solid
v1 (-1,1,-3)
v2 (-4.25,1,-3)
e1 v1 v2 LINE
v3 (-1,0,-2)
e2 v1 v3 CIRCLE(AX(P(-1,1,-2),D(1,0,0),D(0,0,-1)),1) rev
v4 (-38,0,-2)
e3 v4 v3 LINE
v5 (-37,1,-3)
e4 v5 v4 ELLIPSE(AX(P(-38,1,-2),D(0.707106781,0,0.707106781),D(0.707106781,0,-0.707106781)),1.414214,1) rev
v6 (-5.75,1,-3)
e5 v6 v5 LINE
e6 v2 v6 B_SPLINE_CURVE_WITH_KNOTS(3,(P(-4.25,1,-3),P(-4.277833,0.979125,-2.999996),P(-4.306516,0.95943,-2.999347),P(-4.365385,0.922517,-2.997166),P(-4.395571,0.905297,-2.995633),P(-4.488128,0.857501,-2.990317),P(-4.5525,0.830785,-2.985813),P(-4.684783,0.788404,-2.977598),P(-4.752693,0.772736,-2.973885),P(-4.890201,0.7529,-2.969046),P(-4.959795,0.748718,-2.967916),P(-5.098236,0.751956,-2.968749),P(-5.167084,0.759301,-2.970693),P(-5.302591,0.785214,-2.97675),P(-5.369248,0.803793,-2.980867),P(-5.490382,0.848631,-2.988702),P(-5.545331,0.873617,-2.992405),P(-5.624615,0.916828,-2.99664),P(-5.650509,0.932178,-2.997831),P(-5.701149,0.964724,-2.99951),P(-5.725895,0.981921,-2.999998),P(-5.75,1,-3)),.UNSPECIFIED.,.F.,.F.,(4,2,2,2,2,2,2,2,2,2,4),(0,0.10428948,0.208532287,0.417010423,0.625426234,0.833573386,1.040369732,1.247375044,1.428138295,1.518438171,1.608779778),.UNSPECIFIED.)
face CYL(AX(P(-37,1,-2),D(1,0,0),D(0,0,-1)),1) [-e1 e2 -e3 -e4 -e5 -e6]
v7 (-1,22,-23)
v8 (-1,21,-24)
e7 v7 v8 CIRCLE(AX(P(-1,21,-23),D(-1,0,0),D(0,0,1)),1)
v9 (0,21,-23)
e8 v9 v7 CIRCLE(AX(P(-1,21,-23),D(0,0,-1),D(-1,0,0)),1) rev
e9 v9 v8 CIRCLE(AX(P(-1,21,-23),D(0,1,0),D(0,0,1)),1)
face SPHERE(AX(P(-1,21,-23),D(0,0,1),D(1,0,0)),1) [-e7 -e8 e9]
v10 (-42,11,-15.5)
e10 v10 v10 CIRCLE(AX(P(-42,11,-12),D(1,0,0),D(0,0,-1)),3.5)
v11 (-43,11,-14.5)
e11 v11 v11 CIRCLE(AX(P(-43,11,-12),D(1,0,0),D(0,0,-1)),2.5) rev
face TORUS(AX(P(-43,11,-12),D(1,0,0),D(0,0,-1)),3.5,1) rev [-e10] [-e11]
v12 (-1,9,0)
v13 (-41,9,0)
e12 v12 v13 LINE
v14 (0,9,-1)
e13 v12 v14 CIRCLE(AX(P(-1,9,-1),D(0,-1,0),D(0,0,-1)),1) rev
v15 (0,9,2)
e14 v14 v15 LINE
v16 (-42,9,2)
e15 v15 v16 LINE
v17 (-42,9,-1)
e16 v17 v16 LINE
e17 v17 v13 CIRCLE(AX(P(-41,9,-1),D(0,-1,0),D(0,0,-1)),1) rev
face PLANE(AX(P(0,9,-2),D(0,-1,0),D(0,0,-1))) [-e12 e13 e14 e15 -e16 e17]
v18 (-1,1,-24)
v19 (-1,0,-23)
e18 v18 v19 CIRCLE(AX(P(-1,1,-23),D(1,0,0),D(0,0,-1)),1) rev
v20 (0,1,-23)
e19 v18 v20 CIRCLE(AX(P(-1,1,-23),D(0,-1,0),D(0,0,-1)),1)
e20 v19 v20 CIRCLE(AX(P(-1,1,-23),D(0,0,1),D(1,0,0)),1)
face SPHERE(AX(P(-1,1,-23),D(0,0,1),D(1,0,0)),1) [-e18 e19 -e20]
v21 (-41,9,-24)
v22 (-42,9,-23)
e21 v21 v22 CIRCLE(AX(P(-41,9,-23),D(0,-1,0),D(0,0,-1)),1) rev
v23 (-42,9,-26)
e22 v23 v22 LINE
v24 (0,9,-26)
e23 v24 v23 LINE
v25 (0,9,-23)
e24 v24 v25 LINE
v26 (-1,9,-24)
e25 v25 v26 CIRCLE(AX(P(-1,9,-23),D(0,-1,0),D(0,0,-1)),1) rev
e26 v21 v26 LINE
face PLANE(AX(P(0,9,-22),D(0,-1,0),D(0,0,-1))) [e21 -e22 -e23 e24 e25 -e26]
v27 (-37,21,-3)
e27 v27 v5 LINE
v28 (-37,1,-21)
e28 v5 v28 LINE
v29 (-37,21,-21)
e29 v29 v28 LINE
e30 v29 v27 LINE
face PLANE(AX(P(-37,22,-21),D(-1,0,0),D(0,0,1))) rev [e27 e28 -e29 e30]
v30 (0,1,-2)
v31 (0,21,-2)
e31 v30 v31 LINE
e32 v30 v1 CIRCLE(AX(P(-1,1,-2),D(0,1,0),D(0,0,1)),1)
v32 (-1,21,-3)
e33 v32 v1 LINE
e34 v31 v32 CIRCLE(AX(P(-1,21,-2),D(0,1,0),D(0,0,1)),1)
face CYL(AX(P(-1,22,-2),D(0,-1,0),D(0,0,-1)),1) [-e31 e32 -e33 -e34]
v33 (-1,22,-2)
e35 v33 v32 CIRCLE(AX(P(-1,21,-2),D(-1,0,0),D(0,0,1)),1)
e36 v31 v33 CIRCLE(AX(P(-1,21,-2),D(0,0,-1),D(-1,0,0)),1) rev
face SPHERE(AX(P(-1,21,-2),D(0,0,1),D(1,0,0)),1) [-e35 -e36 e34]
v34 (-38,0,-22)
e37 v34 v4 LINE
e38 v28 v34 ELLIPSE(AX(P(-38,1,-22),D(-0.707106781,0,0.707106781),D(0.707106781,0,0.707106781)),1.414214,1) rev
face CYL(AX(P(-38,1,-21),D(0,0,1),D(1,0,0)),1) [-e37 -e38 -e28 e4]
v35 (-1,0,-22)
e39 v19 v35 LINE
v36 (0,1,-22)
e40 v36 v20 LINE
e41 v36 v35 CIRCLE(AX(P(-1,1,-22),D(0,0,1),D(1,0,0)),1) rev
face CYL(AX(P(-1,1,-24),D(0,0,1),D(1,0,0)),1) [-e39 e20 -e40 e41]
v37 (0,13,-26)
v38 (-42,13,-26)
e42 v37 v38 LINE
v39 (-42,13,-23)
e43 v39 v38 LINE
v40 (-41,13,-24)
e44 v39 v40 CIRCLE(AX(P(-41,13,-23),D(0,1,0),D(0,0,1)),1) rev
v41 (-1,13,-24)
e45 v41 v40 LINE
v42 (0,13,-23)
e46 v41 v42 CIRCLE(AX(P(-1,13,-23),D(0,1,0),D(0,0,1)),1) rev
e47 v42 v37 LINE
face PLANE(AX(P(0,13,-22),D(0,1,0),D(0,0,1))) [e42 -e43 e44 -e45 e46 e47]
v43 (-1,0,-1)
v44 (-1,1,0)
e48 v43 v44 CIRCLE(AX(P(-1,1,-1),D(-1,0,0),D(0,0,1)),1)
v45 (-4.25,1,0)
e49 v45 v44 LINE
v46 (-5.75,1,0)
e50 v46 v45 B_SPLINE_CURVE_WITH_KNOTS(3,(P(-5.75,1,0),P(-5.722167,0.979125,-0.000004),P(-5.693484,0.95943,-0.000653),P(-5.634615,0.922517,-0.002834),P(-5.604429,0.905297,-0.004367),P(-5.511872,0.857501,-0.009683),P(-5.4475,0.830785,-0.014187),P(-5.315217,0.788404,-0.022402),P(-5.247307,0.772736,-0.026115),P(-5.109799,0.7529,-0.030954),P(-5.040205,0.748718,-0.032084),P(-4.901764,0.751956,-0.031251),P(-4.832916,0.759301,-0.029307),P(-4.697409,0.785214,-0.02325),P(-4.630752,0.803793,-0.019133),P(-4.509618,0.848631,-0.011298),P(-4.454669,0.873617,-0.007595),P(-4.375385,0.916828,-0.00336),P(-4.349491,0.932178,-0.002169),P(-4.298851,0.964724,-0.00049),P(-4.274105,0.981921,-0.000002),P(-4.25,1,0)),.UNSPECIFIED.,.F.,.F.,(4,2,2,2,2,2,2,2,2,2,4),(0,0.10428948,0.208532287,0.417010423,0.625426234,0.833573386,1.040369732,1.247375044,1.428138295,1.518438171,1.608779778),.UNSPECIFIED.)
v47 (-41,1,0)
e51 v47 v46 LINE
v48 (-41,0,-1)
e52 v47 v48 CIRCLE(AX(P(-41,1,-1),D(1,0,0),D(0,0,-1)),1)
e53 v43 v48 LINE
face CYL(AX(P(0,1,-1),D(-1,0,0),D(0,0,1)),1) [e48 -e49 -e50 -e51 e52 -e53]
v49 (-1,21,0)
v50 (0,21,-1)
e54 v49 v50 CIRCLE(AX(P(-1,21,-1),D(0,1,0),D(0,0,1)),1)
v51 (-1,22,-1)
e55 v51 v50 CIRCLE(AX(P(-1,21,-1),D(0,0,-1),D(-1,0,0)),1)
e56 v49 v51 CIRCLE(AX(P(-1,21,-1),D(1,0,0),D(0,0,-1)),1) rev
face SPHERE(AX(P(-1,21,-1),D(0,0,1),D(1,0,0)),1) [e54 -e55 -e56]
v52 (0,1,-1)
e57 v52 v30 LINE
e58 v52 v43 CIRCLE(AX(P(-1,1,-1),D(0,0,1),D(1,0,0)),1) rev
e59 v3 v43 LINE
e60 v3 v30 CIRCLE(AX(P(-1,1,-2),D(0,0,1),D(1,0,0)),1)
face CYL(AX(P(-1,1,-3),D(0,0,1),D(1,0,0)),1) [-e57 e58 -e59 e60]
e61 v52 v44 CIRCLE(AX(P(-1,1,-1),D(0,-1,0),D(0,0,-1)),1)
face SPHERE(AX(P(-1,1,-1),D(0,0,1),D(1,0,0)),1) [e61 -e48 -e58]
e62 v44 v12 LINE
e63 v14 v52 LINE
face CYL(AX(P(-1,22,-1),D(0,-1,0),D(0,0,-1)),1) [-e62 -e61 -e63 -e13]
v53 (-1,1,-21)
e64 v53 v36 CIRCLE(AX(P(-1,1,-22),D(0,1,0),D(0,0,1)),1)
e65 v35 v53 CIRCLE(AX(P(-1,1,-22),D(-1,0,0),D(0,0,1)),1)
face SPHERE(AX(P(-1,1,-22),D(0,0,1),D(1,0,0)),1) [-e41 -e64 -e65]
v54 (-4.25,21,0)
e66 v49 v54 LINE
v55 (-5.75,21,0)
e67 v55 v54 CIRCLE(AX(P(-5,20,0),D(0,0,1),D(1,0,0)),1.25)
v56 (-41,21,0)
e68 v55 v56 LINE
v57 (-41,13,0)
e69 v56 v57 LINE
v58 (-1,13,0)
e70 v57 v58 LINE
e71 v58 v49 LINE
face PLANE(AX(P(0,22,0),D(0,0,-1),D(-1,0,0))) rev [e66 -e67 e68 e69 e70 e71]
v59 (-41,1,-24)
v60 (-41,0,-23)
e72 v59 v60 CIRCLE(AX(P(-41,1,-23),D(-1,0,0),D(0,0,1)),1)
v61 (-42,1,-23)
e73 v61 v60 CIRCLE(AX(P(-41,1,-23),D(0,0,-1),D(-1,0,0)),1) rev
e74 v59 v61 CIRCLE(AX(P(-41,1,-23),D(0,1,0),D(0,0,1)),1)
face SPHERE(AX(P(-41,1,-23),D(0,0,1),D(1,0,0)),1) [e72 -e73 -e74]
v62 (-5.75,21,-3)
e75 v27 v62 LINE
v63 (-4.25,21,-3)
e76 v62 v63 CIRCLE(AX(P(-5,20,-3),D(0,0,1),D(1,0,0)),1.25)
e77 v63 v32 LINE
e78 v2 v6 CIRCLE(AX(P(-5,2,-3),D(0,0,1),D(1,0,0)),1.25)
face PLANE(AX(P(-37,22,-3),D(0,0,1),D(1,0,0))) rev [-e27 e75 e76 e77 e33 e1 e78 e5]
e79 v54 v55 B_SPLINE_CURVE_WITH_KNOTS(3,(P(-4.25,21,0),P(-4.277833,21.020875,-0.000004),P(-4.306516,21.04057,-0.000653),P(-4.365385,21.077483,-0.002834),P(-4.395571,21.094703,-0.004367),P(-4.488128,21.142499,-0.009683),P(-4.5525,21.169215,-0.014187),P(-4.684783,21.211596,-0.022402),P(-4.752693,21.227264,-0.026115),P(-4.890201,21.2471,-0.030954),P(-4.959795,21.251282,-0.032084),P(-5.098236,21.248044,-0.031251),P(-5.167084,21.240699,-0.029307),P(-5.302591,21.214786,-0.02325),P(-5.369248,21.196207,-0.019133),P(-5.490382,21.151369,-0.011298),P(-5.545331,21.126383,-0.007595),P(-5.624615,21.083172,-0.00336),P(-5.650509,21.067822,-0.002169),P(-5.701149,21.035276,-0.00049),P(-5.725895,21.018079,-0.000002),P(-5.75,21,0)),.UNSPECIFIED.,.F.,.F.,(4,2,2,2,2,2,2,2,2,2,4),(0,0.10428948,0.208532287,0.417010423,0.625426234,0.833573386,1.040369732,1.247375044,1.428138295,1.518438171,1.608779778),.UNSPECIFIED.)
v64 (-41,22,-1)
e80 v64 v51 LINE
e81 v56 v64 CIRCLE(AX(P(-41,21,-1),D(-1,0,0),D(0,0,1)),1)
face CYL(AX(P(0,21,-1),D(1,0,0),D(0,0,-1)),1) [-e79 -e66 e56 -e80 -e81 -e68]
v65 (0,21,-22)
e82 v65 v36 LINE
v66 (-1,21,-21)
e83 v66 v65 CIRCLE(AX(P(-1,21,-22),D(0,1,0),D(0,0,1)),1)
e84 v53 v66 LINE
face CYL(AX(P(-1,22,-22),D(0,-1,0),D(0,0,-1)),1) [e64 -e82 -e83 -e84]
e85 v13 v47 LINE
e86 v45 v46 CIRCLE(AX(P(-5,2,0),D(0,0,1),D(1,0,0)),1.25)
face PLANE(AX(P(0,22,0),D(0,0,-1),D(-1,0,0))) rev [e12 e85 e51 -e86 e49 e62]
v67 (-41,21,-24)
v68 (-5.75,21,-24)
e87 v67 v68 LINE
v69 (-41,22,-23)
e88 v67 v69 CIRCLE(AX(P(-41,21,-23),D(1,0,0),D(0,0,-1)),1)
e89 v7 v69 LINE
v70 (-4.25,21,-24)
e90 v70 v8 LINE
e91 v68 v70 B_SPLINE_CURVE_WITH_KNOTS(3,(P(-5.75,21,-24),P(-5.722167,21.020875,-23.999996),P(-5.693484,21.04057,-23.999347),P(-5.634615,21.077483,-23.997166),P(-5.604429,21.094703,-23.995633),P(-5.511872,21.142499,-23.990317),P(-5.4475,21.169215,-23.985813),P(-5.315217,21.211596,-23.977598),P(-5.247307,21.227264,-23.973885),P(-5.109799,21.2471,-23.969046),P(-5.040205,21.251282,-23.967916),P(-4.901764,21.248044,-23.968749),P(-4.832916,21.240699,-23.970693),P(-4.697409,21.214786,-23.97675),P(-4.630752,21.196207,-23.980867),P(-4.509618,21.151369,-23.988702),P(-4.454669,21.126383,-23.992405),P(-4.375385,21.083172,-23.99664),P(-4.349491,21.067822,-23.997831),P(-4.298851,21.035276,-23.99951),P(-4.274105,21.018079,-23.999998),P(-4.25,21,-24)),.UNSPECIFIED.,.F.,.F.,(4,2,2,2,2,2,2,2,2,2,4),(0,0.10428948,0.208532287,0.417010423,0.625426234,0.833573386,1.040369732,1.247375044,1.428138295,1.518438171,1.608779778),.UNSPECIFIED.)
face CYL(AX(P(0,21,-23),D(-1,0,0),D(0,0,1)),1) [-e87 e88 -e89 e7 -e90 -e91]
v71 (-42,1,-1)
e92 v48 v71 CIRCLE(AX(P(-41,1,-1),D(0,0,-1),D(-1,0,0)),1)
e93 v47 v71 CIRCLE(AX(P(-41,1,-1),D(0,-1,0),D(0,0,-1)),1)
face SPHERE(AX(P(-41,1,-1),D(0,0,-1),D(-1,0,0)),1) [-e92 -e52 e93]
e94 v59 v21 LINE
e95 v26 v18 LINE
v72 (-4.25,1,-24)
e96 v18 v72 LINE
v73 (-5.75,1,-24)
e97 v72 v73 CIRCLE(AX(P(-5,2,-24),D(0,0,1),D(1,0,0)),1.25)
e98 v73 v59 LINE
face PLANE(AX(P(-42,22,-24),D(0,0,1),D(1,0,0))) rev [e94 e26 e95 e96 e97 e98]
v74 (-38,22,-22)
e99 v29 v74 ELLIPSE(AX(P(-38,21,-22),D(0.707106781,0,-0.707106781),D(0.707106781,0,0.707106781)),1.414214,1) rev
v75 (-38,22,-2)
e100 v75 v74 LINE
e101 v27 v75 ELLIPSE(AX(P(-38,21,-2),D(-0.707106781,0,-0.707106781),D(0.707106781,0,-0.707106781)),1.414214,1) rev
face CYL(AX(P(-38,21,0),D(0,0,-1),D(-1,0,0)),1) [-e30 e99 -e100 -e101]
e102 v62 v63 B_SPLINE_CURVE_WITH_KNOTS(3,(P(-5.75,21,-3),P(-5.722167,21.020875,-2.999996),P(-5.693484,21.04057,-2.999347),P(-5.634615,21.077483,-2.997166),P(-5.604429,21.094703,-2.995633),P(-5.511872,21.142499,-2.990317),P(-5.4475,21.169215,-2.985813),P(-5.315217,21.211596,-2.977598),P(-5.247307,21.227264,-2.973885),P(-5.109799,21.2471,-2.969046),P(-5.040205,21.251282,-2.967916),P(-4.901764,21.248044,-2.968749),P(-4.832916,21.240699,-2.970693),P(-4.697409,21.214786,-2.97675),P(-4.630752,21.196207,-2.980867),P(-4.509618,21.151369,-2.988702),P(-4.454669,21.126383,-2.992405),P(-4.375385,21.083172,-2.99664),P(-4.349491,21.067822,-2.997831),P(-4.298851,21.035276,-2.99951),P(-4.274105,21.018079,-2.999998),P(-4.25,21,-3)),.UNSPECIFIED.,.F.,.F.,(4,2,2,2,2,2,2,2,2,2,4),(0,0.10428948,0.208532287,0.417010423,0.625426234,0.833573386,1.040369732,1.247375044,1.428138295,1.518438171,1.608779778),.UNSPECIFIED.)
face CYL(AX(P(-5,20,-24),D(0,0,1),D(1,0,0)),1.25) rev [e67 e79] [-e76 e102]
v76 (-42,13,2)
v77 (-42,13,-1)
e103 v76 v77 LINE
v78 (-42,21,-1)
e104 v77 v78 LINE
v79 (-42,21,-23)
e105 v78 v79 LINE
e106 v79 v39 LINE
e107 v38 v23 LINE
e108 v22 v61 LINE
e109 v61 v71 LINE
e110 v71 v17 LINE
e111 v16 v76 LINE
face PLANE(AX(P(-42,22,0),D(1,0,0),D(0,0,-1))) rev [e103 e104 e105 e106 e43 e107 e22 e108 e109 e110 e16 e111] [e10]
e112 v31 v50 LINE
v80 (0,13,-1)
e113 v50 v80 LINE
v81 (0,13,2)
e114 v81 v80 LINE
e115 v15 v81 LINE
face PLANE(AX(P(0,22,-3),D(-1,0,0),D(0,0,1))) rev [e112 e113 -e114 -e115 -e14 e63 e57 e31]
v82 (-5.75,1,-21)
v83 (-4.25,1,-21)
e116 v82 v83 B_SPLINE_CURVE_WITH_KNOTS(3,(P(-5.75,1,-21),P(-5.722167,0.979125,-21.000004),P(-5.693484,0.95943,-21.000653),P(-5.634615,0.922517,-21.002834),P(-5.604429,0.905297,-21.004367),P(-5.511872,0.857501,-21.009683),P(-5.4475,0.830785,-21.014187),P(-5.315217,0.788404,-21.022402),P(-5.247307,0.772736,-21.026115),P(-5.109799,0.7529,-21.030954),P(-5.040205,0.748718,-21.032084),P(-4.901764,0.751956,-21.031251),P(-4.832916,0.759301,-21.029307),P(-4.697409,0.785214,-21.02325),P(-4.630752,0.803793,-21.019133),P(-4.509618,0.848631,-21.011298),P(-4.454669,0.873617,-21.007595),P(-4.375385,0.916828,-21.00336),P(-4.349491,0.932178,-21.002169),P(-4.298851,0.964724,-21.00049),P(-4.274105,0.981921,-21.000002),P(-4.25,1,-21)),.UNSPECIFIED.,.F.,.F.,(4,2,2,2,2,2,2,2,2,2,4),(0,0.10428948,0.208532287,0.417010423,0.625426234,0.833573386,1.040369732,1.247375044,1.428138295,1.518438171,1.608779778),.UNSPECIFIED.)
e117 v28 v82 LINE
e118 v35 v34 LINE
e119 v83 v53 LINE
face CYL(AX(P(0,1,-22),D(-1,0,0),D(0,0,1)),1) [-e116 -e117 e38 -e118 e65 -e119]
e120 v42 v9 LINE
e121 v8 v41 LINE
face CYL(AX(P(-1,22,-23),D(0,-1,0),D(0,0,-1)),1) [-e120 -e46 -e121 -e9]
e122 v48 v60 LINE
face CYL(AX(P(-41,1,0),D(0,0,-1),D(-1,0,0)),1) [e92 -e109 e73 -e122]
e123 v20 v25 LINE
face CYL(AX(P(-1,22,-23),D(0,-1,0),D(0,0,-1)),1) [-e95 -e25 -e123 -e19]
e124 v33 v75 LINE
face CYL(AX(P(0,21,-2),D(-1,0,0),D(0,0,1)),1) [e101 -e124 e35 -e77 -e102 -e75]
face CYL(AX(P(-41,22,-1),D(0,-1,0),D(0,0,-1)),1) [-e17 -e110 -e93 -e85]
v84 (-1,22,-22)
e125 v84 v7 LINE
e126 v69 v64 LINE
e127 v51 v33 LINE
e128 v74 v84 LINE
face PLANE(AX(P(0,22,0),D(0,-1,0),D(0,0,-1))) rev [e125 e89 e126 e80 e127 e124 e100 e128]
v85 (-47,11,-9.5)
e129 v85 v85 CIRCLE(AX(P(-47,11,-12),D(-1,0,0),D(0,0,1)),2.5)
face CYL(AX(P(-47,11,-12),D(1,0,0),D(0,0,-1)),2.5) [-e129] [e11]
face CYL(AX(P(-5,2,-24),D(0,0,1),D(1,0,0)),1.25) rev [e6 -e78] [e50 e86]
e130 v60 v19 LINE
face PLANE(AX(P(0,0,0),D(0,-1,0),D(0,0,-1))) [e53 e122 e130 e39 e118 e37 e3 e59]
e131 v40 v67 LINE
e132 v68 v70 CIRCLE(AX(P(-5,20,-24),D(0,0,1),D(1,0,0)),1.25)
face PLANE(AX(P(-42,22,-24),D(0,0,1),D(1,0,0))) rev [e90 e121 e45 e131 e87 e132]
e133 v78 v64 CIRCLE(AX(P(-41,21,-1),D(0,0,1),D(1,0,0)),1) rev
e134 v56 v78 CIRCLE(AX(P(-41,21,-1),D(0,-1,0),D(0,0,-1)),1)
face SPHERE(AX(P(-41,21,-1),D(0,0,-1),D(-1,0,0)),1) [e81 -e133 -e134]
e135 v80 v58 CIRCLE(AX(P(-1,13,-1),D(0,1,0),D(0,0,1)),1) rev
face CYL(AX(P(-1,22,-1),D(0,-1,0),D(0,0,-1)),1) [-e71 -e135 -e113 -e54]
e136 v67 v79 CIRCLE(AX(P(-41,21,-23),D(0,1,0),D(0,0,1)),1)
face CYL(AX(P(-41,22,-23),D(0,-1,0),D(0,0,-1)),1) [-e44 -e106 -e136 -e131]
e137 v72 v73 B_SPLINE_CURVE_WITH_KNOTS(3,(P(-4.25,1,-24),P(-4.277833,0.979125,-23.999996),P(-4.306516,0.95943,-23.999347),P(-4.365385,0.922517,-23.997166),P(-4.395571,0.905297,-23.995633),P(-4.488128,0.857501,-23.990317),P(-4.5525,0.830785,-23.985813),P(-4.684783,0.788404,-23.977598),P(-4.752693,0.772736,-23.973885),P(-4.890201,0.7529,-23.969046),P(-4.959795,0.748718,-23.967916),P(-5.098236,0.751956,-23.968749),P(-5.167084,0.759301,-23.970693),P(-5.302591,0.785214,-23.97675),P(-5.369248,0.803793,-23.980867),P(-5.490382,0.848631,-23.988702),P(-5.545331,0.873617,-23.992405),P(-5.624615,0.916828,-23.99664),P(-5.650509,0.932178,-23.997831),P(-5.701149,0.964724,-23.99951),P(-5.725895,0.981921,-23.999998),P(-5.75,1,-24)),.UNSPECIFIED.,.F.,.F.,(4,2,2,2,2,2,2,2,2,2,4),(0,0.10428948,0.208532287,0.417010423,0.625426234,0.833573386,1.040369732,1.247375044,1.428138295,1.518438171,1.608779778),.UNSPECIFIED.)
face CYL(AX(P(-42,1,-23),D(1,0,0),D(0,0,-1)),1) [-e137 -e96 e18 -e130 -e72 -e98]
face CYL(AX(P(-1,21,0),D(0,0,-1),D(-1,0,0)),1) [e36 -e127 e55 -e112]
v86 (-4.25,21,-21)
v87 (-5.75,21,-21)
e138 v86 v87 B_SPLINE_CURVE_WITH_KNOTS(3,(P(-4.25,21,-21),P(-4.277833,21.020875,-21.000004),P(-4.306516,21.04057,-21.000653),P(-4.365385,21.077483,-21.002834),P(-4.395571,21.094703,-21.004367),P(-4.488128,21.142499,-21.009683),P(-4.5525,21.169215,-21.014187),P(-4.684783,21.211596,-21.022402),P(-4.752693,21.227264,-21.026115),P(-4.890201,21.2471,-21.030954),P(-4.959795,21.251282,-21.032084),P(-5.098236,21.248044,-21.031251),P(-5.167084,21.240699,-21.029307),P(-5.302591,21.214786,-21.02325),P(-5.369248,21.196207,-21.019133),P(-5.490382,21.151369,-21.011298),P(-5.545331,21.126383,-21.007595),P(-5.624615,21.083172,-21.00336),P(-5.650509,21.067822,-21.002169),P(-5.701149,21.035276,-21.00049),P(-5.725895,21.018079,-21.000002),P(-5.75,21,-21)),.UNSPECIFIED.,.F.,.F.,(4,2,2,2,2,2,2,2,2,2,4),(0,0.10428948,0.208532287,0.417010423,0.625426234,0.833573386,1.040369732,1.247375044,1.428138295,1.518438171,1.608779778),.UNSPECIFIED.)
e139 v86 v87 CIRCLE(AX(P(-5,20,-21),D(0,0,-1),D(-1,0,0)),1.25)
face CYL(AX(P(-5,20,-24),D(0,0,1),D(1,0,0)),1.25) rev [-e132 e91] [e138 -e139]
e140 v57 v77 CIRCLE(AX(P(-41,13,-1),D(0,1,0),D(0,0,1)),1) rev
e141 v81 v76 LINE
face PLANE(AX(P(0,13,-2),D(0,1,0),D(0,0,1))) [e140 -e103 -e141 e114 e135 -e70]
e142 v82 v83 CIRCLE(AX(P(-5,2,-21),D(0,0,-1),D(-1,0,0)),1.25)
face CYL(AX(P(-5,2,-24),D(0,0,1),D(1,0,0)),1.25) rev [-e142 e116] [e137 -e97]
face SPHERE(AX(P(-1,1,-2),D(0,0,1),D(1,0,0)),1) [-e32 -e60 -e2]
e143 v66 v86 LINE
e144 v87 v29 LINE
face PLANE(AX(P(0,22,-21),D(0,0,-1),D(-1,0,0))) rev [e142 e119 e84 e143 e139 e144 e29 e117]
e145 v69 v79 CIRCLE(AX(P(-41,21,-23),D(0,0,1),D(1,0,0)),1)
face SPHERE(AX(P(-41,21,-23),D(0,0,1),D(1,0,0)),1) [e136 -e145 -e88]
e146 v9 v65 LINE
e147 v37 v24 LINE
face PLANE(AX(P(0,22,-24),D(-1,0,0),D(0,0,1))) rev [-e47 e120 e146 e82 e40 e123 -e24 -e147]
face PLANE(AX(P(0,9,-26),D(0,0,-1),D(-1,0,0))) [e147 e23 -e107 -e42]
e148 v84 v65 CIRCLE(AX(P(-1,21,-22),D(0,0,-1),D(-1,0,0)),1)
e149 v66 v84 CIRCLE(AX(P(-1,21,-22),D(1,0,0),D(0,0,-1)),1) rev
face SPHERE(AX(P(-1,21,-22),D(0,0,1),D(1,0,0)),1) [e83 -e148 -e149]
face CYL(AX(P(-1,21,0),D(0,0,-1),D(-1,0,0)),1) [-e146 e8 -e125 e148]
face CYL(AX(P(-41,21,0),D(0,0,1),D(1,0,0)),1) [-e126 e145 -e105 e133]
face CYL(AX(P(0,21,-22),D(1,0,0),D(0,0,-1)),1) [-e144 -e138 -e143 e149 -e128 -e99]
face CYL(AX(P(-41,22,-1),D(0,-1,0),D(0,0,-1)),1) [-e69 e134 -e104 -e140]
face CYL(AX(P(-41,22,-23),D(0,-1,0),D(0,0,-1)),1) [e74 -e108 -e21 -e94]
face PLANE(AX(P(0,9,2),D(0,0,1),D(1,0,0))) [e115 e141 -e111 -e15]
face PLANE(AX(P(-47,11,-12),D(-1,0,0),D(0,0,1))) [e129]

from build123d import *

# Parameters (mm, degrees)
BOSS_EXTRUDE1_DEPTH = 22
SKETCH2_R           = 1.25
CUT_EXTRUDE1_DEPTH  = 54.141321022
SKETCH3_R           = 2.5
BOSS_EXTRUDE2_DEPTH = 5
FILLET1_R           = 1
SKETCH4_W           = 4
SKETCH4_H           = 4
BOSS_EXTRUDE3_DEPTH = 42
FILLET2_R           = 1
FILLET3_R           = 1
FILLET4_R           = 1
FILLET5_R           = 1


with BuildPart() as part:
    # Sketch1 → Boss-Extrude1 (new body)
    with BuildSketch(Plane(origin=(0, 0, 0), x_dir=(1, 0, 0), z_dir=(0, 1, 0))):
        Polygon((0, 0), (-42, 0), (-42, 24), (0, 24), (0, 21), (-37, 21), (-37, 3), (0, 3), align=None)
    extrude(amount=BOSS_EXTRUDE1_DEPTH)

    # Sketch2 → Cut-Extrude1 (cut, through all)
    with BuildSketch(Plane.XY):
        with Locations((-5, 20)):
            Circle(SKETCH2_R)
        with Locations((-5, 2)):
            Circle(SKETCH2_R)
    extrude(amount=-CUT_EXTRUDE1_DEPTH, mode=Mode.SUBTRACT)

    # Sketch3 → Boss-Extrude2 (add)
    with BuildSketch(Plane.ZY.offset(42)):
        with Locations((-12, 11)):
            Circle(SKETCH3_R)
    extrude(amount=BOSS_EXTRUDE2_DEPTH)

    # Fillet1
    fillet1_edges = [part.edges().sort_by_distance(p)[0] for p in [
        (-42, 11, -14.5),
    ]]
    fillet(fillet1_edges, radius=FILLET1_R)

    # Sketch4 → Boss-Extrude3 (add)
    with BuildSketch(Plane.ZY.offset(42)):
        with Locations((-24, 11)):
            Rectangle(SKETCH4_W, SKETCH4_H)
        with Locations((0, 11)):
            Rectangle(SKETCH4_W, SKETCH4_H)
    extrude(amount=-BOSS_EXTRUDE3_DEPTH)

    # Fillet2
    fillet2_edges = [part.edges().sort_by_distance(p)[0] for p in [
        (-42, 22, -12),
        (-42, 0, -12),
    ]]
    fillet(fillet2_edges, radius=FILLET2_R)

    # Fillet3
    # the kernel refuses this fillet: 1 mm, written as the material it takes off along each edge
    with BuildSketch(Plane(origin=(-37, 22, -21), x_dir=(-1, 0, 0), z_dir=(0, 0, 1))) as fillet3_piece_1:
        with BuildLine():
            CenterArc((FILLET3_R, FILLET3_R), FILLET3_R, 180, 90)
            Line((0, FILLET3_R), (0, 0))
            Line((0, 0), (FILLET3_R, 0))
        make_face()
    extrude(amount=18, mode=Mode.SUBTRACT)
    with BuildSketch(Plane(origin=(2.5, 22, -21), x_dir=(0, 0, -1), z_dir=(-1, 0, 0)), Plane(origin=(-37, 22, -3), x_dir=(0, 0, 1), z_dir=(1, 0, 0))) as fillet3_piece_2:
        with BuildLine():
            CenterArc((FILLET3_R, FILLET3_R), FILLET3_R, 180, 90)
            Line((0, FILLET3_R), (0, 0))
            Line((0, 0), (FILLET3_R, 0))
        make_face()
    extrude(amount=39.5, mode=Mode.SUBTRACT)
    with BuildSketch(Plane(origin=(0, 22, -26.5), x_dir=(0, -1, 0), z_dir=(0, 0, 1)), Plane(origin=(0, 22, -5.5), x_dir=(0, -1, 0), z_dir=(0, 0, 1)), Plane(origin=(-42, 13, 0), x_dir=(0, 0, -1), z_dir=(0, 1, 0))) as fillet3_piece_3:
        with BuildLine():
            CenterArc((FILLET3_R, -FILLET3_R), FILLET3_R, 90, 90)
            Line((0, -FILLET3_R), (0, 0))
            Line((0, 0), (FILLET3_R, 0))
        make_face()
    extrude(amount=8, mode=Mode.SUBTRACT)
    with BuildSketch(Plane(origin=(-41, 22, -24), x_dir=(0, -1, 0), z_dir=(1, 0, 0)), Plane(origin=(2.5, 22, 0), x_dir=(0, -1, 0), z_dir=(-1, 0, 0))) as fillet3_piece_4:
        with BuildLine():
            CenterArc((FILLET3_R, -FILLET3_R), FILLET3_R, 90, 90)
            Line((0, -FILLET3_R), (0, 0))
            Line((0, 0), (FILLET3_R, 0))
        make_face()
    extrude(amount=43.5, mode=Mode.SUBTRACT)
    with BuildSketch(Plane(origin=(-42, 13, -24), x_dir=(0, 0, 1), z_dir=(0, 1, 0))) as fillet3_piece_5:
        with BuildLine():
            CenterArc((FILLET3_R, FILLET3_R), FILLET3_R, 180, 90)
            Line((0, FILLET3_R), (0, 0))
            Line((0, 0), (FILLET3_R, 0))
        make_face()
    extrude(amount=8, mode=Mode.SUBTRACT)
    with BuildSketch(Plane(origin=(-41, 21, 0), x_dir=(-1, 0, 0), z_dir=(0, -1, 0))) as fillet3_piece_6:
        with BuildLine():
            CenterArc((1 - FILLET3_R, FILLET3_R), FILLET3_R, 270, 90)
            Line((1, FILLET3_R), (1, 0))
            Line((1, 0), (1 - FILLET3_R, 0))
        make_face()
    revolve(axis=Axis((-41, 21, 0), (0, 0, -1)), revolution_arc=90, mode=Mode.SUBTRACT)
    with BuildSketch(Plane(origin=(-41, 21, -24), x_dir=(-1, 0, 0), z_dir=(0, -1, 0))) as fillet3_piece_7:
        with BuildLine():
            CenterArc((1 - FILLET3_R, -FILLET3_R), FILLET3_R, 0, 90)
            Line((1 - FILLET3_R, 0), (1, 0))
            Line((1, 0), (1, -FILLET3_R))
        make_face()
    revolve(axis=Axis((-41, 21, -24), (0, 0, -1)), revolution_arc=90, mode=Mode.SUBTRACT)
    with BuildSketch(Plane(origin=(-37, 22, -23.5), x_dir=(-1, 0, 0), z_dir=(0, 0, 1))) as fillet3_piece_8a_section:
        with BuildLine():
            CenterArc((FILLET3_R, FILLET3_R), FILLET3_R, 180, 90)
            Line((0, FILLET3_R), (0, 0))
            Line((0, 0), (FILLET3_R, 0))
        make_face()
    fillet3_piece_8a = extrude(amount=20.5, mode=Mode.PRIVATE)
    fillet3_piece_8a = split(fillet3_piece_8a, bisect_by=Plane(origin=(-37.226395114, 21.773604886, -21), z_dir=(0, 0, -1)), keep=Keep.TOP, mode=Mode.PRIVATE)
    with BuildSketch(Plane(origin=(2.5, 22, -21), x_dir=(0, 0, -1), z_dir=(-1, 0, 0))) as fillet3_piece_8b_section:
        with BuildLine():
            CenterArc((FILLET3_R, FILLET3_R), FILLET3_R, 180, 90)
            Line((0, FILLET3_R), (0, 0))
            Line((0, 0), (FILLET3_R, 0))
        make_face()
    fillet3_piece_8b = extrude(amount=42, mode=Mode.PRIVATE)
    fillet3_piece_8b = split(fillet3_piece_8b, bisect_by=Plane(origin=(-37, 21.773604886, -21.226395114), z_dir=(-1, 0, 0)), keep=Keep.TOP, mode=Mode.PRIVATE)
    fillet3_piece_8 = fillet3_piece_8a & fillet3_piece_8b
    add(fillet3_piece_8, mode=Mode.SUBTRACT)
    with BuildSketch(Plane(origin=(-39.5, 22, -3), x_dir=(0, 0, 1), z_dir=(1, 0, 0))) as fillet3_piece_9a_section:
        with BuildLine():
            CenterArc((FILLET3_R, FILLET3_R), FILLET3_R, 180, 90)
            Line((0, FILLET3_R), (0, 0))
            Line((0, 0), (FILLET3_R, 0))
        make_face()
    fillet3_piece_9a = extrude(amount=42, mode=Mode.PRIVATE)
    fillet3_piece_9a = split(fillet3_piece_9a, bisect_by=Plane(origin=(-37, 21.773604886, -2.773604886), z_dir=(-1, 0, 0)), keep=Keep.TOP, mode=Mode.PRIVATE)
    with BuildSketch(Plane(origin=(-37, 22, -21), x_dir=(-1, 0, 0), z_dir=(0, 0, 1))) as fillet3_piece_9b_section:
        with BuildLine():
            CenterArc((FILLET3_R, FILLET3_R), FILLET3_R, 180, 90)
            Line((0, FILLET3_R), (0, 0))
            Line((0, 0), (FILLET3_R, 0))
        make_face()
    fillet3_piece_9b = extrude(amount=20.5, mode=Mode.PRIVATE)
    fillet3_piece_9b = split(fillet3_piece_9b, bisect_by=Plane(origin=(-37.226395114, 21.773604886, -3), z_dir=(0, 0, 1)), keep=Keep.TOP, mode=Mode.PRIVATE)
    fillet3_piece_9 = fillet3_piece_9a & fillet3_piece_9b
    add(fillet3_piece_9, mode=Mode.SUBTRACT)

    # Fillet4
    # the kernel refuses this fillet: 1 mm, written as the material it takes off along each edge
    with BuildSketch(Plane(origin=(-37, 0, -3), x_dir=(0, 1, 0), z_dir=(1, 0, 0)), Plane(origin=(2.5, 0, -21), x_dir=(0, 1, 0), z_dir=(-1, 0, 0))) as fillet4_piece_1:
        with BuildLine():
            CenterArc((FILLET4_R, FILLET4_R), FILLET4_R, 180, 90)
            Line((0, FILLET4_R), (0, 0))
            Line((0, 0), (FILLET4_R, 0))
        make_face()
    extrude(amount=39.5, mode=Mode.SUBTRACT)
    with BuildSketch(Plane(origin=(0, 0, -5.5), x_dir=(0, 1, 0), z_dir=(0, 0, 1)), Plane(origin=(-42, 1, -24), x_dir=(0, 0, 1), z_dir=(0, 1, 0)), Plane(origin=(0, 0, -26.5), x_dir=(0, 1, 0), z_dir=(0, 0, 1))) as fillet4_piece_2:
        with BuildLine():
            CenterArc((FILLET4_R, FILLET4_R), FILLET4_R, 180, 90)
            Line((0, FILLET4_R), (0, 0))
            Line((0, 0), (FILLET4_R, 0))
        make_face()
    extrude(amount=8, mode=Mode.SUBTRACT)
    with BuildSketch(Plane(origin=(-42, 1, 0), x_dir=(0, 0, -1), z_dir=(0, 1, 0))) as fillet4_piece_3:
        with BuildLine():
            CenterArc((FILLET4_R, -FILLET4_R), FILLET4_R, 90, 90)
            Line((0, -FILLET4_R), (0, 0))
            Line((0, 0), (FILLET4_R, 0))
        make_face()
    extrude(amount=8, mode=Mode.SUBTRACT)
    with BuildSketch(Plane(origin=(-41, 0, -24), x_dir=(0, 1, 0), z_dir=(1, 0, 0))) as fillet4_piece_4:
        with BuildLine():
            CenterArc((FILLET4_R, FILLET4_R), FILLET4_R, 180, 90)
            Line((0, FILLET4_R), (0, 0))
            Line((0, 0), (FILLET4_R, 0))
        make_face()
    extrude(amount=43.5, mode=Mode.SUBTRACT)
    with BuildSketch(Plane(origin=(2.5, 0, 0), x_dir=(0, 0, -1), z_dir=(-1, 0, 0))) as fillet4_piece_5:
        with BuildLine():
            CenterArc((FILLET4_R, -FILLET4_R), FILLET4_R, 90, 90)
            Line((0, -FILLET4_R), (0, 0))
            Line((0, 0), (FILLET4_R, 0))
        make_face()
    extrude(amount=43.5, mode=Mode.SUBTRACT)
    with BuildSketch(Plane(origin=(-41, 1, 0), x_dir=(-1, 0, 0), z_dir=(0, 1, 0))) as fillet4_piece_6:
        with BuildLine():
            CenterArc((1 - FILLET4_R, -FILLET4_R), FILLET4_R, 360, 90)
            Line((1, -FILLET4_R), (1, 0))
            Line((1, 0), (1 - FILLET4_R, 0))
        make_face()
    revolve(axis=Axis((-41, 1, 0), (0, 0, 1)), revolution_arc=90, mode=Mode.SUBTRACT)
    with BuildSketch(Plane(origin=(-41, 1, -24), x_dir=(-1, 0, 0), z_dir=(0, 1, 0))) as fillet4_piece_7:
        with BuildLine():
            CenterArc((1 - FILLET4_R, FILLET4_R), FILLET4_R, 270, 90)
            Line((1, FILLET4_R), (1, 0))
            Line((1, 0), (1 - FILLET4_R, 0))
        make_face()
    revolve(axis=Axis((-41, 1, -24), (0, 0, 1)), revolution_arc=90, mode=Mode.SUBTRACT)
    with BuildSketch(Plane(origin=(-37, 0, -21), x_dir=(0, 1, 0), z_dir=(0, 0, 1))) as fillet4_piece_8:
        with BuildLine():
            CenterArc((FILLET4_R, FILLET4_R), FILLET4_R, 180, 90)
            Line((0, FILLET4_R), (0, 0))
            Line((0, 0), (FILLET4_R, 0))
        make_face()
    extrude(amount=18, mode=Mode.SUBTRACT)
    with BuildSketch(Plane(origin=(-39.5, 0, -3), x_dir=(0, 1, 0), z_dir=(1, 0, 0))) as fillet4_piece_9a_section:
        with BuildLine():
            CenterArc((FILLET4_R, FILLET4_R), FILLET4_R, 180, 90)
            Line((0, FILLET4_R), (0, 0))
            Line((0, 0), (FILLET4_R, 0))
        make_face()
    fillet4_piece_9a = extrude(amount=42, mode=Mode.PRIVATE)
    fillet4_piece_9a = split(fillet4_piece_9a, bisect_by=Plane(origin=(-37, 0.226395114, -2.773604886), z_dir=(-1, 0, 0)), keep=Keep.TOP, mode=Mode.PRIVATE)
    with BuildSketch(Plane(origin=(-37, 0, -21), x_dir=(0, 1, 0), z_dir=(0, 0, 1))) as fillet4_piece_9b_section:
        with BuildLine():
            CenterArc((FILLET4_R, FILLET4_R), FILLET4_R, 180, 90)
            Line((0, FILLET4_R), (0, 0))
            Line((0, 0), (FILLET4_R, 0))
        make_face()
    fillet4_piece_9b = extrude(amount=20.5, mode=Mode.PRIVATE)
    fillet4_piece_9b = split(fillet4_piece_9b, bisect_by=Plane(origin=(-37.226395114, 0.226395114, -3), z_dir=(0, 0, 1)), keep=Keep.TOP, mode=Mode.PRIVATE)
    fillet4_piece_9 = fillet4_piece_9a & fillet4_piece_9b
    add(fillet4_piece_9, mode=Mode.SUBTRACT)
    with BuildSketch(Plane(origin=(2.5, 0, -21), x_dir=(0, 1, 0), z_dir=(-1, 0, 0))) as fillet4_piece_10a_section:
        with BuildLine():
            CenterArc((FILLET4_R, FILLET4_R), FILLET4_R, 180, 90)
            Line((0, FILLET4_R), (0, 0))
            Line((0, 0), (FILLET4_R, 0))
        make_face()
    fillet4_piece_10a = extrude(amount=42, mode=Mode.PRIVATE)
    fillet4_piece_10a = split(fillet4_piece_10a, bisect_by=Plane(origin=(-37, 0.226395114, -21.226395114), z_dir=(-1, 0, 0)), keep=Keep.TOP, mode=Mode.PRIVATE)
    with BuildSketch(Plane(origin=(-37, 0, -23.5), x_dir=(0, 1, 0), z_dir=(0, 0, 1))) as fillet4_piece_10b_section:
        with BuildLine():
            CenterArc((FILLET4_R, FILLET4_R), FILLET4_R, 180, 90)
            Line((0, FILLET4_R), (0, 0))
            Line((0, 0), (FILLET4_R, 0))
        make_face()
    fillet4_piece_10b = extrude(amount=20.5, mode=Mode.PRIVATE)
    fillet4_piece_10b = split(fillet4_piece_10b, bisect_by=Plane(origin=(-37.226395114, 0.226395114, -21), z_dir=(0, 0, -1)), keep=Keep.TOP, mode=Mode.PRIVATE)
    fillet4_piece_10 = fillet4_piece_10a & fillet4_piece_10b
    add(fillet4_piece_10, mode=Mode.SUBTRACT)

    # Fillet5
    # the kernel refuses this fillet: 1 mm, written as the material it takes off along each edge
    with BuildSketch(Plane(origin=(-1, 21, -23), x_dir=(1, 0, 0), z_dir=(0, 0, -1))) as fillet5_piece_1_section:
        Polygon((0, 0), (FILLET5_R, 0), (FILLET5_R, -FILLET5_R), (0, -FILLET5_R), align=None)
    fillet5_piece_1 = extrude(amount=FILLET5_R, mode=Mode.PRIVATE)
    fillet5_piece_1 = fillet5_piece_1 - Plane(origin=(-1, 21, -23), x_dir=(-0.7071067811865475, -0.7071067811865475, 0), z_dir=(0, 0, -1)) * Sphere(FILLET5_R, mode=Mode.PRIVATE)
    add(fillet5_piece_1, mode=Mode.SUBTRACT)
    with BuildSketch(Plane(origin=(-1, 21, -22), x_dir=(0, 0, 1), z_dir=(1, 0, 0))) as fillet5_piece_2_section:
        Polygon((0, 0), (FILLET5_R, 0), (FILLET5_R, -FILLET5_R), (0, -FILLET5_R), align=None)
    fillet5_piece_2 = extrude(amount=FILLET5_R, mode=Mode.PRIVATE)
    fillet5_piece_2 = fillet5_piece_2 - Plane(origin=(-1, 21, -22), x_dir=(0, -0.7071067811865475, -0.7071067811865475), z_dir=(1, 0, 0)) * Sphere(FILLET5_R, mode=Mode.PRIVATE)
    add(fillet5_piece_2, mode=Mode.SUBTRACT)
    with BuildSketch(Plane(origin=(-1, 21, -2), x_dir=(0, 0, -1), z_dir=(1, 0, 0))) as fillet5_piece_3_section:
        Polygon((0, 0), (FILLET5_R, 0), (FILLET5_R, FILLET5_R), (0, FILLET5_R), align=None)
    fillet5_piece_3 = extrude(amount=FILLET5_R, mode=Mode.PRIVATE)
    fillet5_piece_3 = fillet5_piece_3 - Plane(origin=(-1, 21, -2), x_dir=(0, -0.7071067811865475, 0.7071067811865475), z_dir=(1, 0, 0)) * Sphere(FILLET5_R, mode=Mode.PRIVATE)
    add(fillet5_piece_3, mode=Mode.SUBTRACT)
    with BuildSketch(Plane(origin=(-1, 21, -1), x_dir=(0, 0, 1), z_dir=(1, 0, 0))) as fillet5_piece_4_section:
        Polygon((0, 0), (FILLET5_R, 0), (FILLET5_R, -FILLET5_R), (0, -FILLET5_R), align=None)
    fillet5_piece_4 = extrude(amount=FILLET5_R, mode=Mode.PRIVATE)
    fillet5_piece_4 = fillet5_piece_4 - Plane(origin=(-1, 21, -1), x_dir=(0, -0.7071067811865475, -0.7071067811865475), z_dir=(1, 0, 0)) * Sphere(FILLET5_R, mode=Mode.PRIVATE)
    add(fillet5_piece_4, mode=Mode.SUBTRACT)
    with BuildSketch(Plane(origin=(-1, 1, -1), x_dir=(0, 0, 1), z_dir=(1, 0, 0))) as fillet5_piece_5_section:
        Polygon((0, 0), (FILLET5_R, 0), (FILLET5_R, FILLET5_R), (0, FILLET5_R), align=None)
    fillet5_piece_5 = extrude(amount=FILLET5_R, mode=Mode.PRIVATE)
    fillet5_piece_5 = fillet5_piece_5 - Plane(origin=(-1, 1, -1), x_dir=(0, 0.7071067811865475, -0.7071067811865475), z_dir=(1, 0, 0)) * Sphere(FILLET5_R, mode=Mode.PRIVATE)
    add(fillet5_piece_5, mode=Mode.SUBTRACT)
    with BuildSketch(Plane(origin=(-1, 1, -2), x_dir=(0, 0, -1), z_dir=(1, 0, 0))) as fillet5_piece_6_section:
        Polygon((0, 0), (FILLET5_R, 0), (FILLET5_R, -FILLET5_R), (0, -FILLET5_R), align=None)
    fillet5_piece_6 = extrude(amount=FILLET5_R, mode=Mode.PRIVATE)
    fillet5_piece_6 = fillet5_piece_6 - Plane(origin=(-1, 1, -2), x_dir=(0, 0.7071067811865475, 0.7071067811865475), z_dir=(1, 0, 0)) * Sphere(FILLET5_R, mode=Mode.PRIVATE)
    add(fillet5_piece_6, mode=Mode.SUBTRACT)
    with BuildSketch(Plane(origin=(-1, 1, -22), x_dir=(0, 0, 1), z_dir=(1, 0, 0))) as fillet5_piece_7_section:
        Polygon((0, 0), (FILLET5_R, 0), (FILLET5_R, FILLET5_R), (0, FILLET5_R), align=None)
    fillet5_piece_7 = extrude(amount=FILLET5_R, mode=Mode.PRIVATE)
    fillet5_piece_7 = fillet5_piece_7 - Plane(origin=(-1, 1, -22), x_dir=(0, 0.7071067811865475, -0.7071067811865475), z_dir=(1, 0, 0)) * Sphere(FILLET5_R, mode=Mode.PRIVATE)
    add(fillet5_piece_7, mode=Mode.SUBTRACT)
    with BuildSketch(Plane(origin=(-1, 1, -23), x_dir=(1, 0, 0), z_dir=(0, 0, -1))) as fillet5_piece_8_section:
        Polygon((0, 0), (FILLET5_R, 0), (FILLET5_R, FILLET5_R), (0, FILLET5_R), align=None)
    fillet5_piece_8 = extrude(amount=FILLET5_R, mode=Mode.PRIVATE)
    fillet5_piece_8 = fillet5_piece_8 - Plane(origin=(-1, 1, -23), x_dir=(-0.7071067811865475, 0.7071067811865475, 0), z_dir=(0, 0, -1)) * Sphere(FILLET5_R, mode=Mode.PRIVATE)
    add(fillet5_piece_8, mode=Mode.SUBTRACT)
    with BuildSketch(Plane(origin=(0, 13, 0), x_dir=(0, 0, -1), z_dir=(0, 1, 0)), Plane(origin=(0, 13, -24), x_dir=(-1, 0, 0), z_dir=(0, 1, 0)), Plane(origin=(0, 1, -24), x_dir=(-1, 0, 0), z_dir=(0, 1, 0)), Plane(origin=(0, 1, 0), x_dir=(0, 0, -1), z_dir=(0, 1, 0))) as fillet5_piece_9:
        with BuildLine():
            CenterArc((FILLET5_R, FILLET5_R), FILLET5_R, 180, 90)
            Line((0, FILLET5_R), (0, 0))
            Line((0, 0), (FILLET5_R, 0))
        make_face()
    extrude(amount=8, mode=Mode.SUBTRACT)
    with BuildSketch(Plane(origin=(0, 1, -21), x_dir=(0, 0, -1), z_dir=(0, 1, 0))) as fillet5_piece_10:
        with BuildLine():
            CenterArc((FILLET5_R, FILLET5_R), FILLET5_R, 180, 90)
            Line((0, FILLET5_R), (0, 0))
            Line((0, 0), (FILLET5_R, 0))
        make_face()
    extrude(amount=20, mode=Mode.SUBTRACT)
    with BuildSketch(Plane(origin=(0, 1, -3), x_dir=(0, 0, 1), z_dir=(0, 1, 0))) as fillet5_piece_11:
        with BuildLine():
            CenterArc((FILLET5_R, -FILLET5_R), FILLET5_R, 90, 90)
            Line((0, -FILLET5_R), (0, 0))
            Line((0, 0), (FILLET5_R, 0))
        make_face()
    extrude(amount=20, mode=Mode.SUBTRACT)


solid = part.part
